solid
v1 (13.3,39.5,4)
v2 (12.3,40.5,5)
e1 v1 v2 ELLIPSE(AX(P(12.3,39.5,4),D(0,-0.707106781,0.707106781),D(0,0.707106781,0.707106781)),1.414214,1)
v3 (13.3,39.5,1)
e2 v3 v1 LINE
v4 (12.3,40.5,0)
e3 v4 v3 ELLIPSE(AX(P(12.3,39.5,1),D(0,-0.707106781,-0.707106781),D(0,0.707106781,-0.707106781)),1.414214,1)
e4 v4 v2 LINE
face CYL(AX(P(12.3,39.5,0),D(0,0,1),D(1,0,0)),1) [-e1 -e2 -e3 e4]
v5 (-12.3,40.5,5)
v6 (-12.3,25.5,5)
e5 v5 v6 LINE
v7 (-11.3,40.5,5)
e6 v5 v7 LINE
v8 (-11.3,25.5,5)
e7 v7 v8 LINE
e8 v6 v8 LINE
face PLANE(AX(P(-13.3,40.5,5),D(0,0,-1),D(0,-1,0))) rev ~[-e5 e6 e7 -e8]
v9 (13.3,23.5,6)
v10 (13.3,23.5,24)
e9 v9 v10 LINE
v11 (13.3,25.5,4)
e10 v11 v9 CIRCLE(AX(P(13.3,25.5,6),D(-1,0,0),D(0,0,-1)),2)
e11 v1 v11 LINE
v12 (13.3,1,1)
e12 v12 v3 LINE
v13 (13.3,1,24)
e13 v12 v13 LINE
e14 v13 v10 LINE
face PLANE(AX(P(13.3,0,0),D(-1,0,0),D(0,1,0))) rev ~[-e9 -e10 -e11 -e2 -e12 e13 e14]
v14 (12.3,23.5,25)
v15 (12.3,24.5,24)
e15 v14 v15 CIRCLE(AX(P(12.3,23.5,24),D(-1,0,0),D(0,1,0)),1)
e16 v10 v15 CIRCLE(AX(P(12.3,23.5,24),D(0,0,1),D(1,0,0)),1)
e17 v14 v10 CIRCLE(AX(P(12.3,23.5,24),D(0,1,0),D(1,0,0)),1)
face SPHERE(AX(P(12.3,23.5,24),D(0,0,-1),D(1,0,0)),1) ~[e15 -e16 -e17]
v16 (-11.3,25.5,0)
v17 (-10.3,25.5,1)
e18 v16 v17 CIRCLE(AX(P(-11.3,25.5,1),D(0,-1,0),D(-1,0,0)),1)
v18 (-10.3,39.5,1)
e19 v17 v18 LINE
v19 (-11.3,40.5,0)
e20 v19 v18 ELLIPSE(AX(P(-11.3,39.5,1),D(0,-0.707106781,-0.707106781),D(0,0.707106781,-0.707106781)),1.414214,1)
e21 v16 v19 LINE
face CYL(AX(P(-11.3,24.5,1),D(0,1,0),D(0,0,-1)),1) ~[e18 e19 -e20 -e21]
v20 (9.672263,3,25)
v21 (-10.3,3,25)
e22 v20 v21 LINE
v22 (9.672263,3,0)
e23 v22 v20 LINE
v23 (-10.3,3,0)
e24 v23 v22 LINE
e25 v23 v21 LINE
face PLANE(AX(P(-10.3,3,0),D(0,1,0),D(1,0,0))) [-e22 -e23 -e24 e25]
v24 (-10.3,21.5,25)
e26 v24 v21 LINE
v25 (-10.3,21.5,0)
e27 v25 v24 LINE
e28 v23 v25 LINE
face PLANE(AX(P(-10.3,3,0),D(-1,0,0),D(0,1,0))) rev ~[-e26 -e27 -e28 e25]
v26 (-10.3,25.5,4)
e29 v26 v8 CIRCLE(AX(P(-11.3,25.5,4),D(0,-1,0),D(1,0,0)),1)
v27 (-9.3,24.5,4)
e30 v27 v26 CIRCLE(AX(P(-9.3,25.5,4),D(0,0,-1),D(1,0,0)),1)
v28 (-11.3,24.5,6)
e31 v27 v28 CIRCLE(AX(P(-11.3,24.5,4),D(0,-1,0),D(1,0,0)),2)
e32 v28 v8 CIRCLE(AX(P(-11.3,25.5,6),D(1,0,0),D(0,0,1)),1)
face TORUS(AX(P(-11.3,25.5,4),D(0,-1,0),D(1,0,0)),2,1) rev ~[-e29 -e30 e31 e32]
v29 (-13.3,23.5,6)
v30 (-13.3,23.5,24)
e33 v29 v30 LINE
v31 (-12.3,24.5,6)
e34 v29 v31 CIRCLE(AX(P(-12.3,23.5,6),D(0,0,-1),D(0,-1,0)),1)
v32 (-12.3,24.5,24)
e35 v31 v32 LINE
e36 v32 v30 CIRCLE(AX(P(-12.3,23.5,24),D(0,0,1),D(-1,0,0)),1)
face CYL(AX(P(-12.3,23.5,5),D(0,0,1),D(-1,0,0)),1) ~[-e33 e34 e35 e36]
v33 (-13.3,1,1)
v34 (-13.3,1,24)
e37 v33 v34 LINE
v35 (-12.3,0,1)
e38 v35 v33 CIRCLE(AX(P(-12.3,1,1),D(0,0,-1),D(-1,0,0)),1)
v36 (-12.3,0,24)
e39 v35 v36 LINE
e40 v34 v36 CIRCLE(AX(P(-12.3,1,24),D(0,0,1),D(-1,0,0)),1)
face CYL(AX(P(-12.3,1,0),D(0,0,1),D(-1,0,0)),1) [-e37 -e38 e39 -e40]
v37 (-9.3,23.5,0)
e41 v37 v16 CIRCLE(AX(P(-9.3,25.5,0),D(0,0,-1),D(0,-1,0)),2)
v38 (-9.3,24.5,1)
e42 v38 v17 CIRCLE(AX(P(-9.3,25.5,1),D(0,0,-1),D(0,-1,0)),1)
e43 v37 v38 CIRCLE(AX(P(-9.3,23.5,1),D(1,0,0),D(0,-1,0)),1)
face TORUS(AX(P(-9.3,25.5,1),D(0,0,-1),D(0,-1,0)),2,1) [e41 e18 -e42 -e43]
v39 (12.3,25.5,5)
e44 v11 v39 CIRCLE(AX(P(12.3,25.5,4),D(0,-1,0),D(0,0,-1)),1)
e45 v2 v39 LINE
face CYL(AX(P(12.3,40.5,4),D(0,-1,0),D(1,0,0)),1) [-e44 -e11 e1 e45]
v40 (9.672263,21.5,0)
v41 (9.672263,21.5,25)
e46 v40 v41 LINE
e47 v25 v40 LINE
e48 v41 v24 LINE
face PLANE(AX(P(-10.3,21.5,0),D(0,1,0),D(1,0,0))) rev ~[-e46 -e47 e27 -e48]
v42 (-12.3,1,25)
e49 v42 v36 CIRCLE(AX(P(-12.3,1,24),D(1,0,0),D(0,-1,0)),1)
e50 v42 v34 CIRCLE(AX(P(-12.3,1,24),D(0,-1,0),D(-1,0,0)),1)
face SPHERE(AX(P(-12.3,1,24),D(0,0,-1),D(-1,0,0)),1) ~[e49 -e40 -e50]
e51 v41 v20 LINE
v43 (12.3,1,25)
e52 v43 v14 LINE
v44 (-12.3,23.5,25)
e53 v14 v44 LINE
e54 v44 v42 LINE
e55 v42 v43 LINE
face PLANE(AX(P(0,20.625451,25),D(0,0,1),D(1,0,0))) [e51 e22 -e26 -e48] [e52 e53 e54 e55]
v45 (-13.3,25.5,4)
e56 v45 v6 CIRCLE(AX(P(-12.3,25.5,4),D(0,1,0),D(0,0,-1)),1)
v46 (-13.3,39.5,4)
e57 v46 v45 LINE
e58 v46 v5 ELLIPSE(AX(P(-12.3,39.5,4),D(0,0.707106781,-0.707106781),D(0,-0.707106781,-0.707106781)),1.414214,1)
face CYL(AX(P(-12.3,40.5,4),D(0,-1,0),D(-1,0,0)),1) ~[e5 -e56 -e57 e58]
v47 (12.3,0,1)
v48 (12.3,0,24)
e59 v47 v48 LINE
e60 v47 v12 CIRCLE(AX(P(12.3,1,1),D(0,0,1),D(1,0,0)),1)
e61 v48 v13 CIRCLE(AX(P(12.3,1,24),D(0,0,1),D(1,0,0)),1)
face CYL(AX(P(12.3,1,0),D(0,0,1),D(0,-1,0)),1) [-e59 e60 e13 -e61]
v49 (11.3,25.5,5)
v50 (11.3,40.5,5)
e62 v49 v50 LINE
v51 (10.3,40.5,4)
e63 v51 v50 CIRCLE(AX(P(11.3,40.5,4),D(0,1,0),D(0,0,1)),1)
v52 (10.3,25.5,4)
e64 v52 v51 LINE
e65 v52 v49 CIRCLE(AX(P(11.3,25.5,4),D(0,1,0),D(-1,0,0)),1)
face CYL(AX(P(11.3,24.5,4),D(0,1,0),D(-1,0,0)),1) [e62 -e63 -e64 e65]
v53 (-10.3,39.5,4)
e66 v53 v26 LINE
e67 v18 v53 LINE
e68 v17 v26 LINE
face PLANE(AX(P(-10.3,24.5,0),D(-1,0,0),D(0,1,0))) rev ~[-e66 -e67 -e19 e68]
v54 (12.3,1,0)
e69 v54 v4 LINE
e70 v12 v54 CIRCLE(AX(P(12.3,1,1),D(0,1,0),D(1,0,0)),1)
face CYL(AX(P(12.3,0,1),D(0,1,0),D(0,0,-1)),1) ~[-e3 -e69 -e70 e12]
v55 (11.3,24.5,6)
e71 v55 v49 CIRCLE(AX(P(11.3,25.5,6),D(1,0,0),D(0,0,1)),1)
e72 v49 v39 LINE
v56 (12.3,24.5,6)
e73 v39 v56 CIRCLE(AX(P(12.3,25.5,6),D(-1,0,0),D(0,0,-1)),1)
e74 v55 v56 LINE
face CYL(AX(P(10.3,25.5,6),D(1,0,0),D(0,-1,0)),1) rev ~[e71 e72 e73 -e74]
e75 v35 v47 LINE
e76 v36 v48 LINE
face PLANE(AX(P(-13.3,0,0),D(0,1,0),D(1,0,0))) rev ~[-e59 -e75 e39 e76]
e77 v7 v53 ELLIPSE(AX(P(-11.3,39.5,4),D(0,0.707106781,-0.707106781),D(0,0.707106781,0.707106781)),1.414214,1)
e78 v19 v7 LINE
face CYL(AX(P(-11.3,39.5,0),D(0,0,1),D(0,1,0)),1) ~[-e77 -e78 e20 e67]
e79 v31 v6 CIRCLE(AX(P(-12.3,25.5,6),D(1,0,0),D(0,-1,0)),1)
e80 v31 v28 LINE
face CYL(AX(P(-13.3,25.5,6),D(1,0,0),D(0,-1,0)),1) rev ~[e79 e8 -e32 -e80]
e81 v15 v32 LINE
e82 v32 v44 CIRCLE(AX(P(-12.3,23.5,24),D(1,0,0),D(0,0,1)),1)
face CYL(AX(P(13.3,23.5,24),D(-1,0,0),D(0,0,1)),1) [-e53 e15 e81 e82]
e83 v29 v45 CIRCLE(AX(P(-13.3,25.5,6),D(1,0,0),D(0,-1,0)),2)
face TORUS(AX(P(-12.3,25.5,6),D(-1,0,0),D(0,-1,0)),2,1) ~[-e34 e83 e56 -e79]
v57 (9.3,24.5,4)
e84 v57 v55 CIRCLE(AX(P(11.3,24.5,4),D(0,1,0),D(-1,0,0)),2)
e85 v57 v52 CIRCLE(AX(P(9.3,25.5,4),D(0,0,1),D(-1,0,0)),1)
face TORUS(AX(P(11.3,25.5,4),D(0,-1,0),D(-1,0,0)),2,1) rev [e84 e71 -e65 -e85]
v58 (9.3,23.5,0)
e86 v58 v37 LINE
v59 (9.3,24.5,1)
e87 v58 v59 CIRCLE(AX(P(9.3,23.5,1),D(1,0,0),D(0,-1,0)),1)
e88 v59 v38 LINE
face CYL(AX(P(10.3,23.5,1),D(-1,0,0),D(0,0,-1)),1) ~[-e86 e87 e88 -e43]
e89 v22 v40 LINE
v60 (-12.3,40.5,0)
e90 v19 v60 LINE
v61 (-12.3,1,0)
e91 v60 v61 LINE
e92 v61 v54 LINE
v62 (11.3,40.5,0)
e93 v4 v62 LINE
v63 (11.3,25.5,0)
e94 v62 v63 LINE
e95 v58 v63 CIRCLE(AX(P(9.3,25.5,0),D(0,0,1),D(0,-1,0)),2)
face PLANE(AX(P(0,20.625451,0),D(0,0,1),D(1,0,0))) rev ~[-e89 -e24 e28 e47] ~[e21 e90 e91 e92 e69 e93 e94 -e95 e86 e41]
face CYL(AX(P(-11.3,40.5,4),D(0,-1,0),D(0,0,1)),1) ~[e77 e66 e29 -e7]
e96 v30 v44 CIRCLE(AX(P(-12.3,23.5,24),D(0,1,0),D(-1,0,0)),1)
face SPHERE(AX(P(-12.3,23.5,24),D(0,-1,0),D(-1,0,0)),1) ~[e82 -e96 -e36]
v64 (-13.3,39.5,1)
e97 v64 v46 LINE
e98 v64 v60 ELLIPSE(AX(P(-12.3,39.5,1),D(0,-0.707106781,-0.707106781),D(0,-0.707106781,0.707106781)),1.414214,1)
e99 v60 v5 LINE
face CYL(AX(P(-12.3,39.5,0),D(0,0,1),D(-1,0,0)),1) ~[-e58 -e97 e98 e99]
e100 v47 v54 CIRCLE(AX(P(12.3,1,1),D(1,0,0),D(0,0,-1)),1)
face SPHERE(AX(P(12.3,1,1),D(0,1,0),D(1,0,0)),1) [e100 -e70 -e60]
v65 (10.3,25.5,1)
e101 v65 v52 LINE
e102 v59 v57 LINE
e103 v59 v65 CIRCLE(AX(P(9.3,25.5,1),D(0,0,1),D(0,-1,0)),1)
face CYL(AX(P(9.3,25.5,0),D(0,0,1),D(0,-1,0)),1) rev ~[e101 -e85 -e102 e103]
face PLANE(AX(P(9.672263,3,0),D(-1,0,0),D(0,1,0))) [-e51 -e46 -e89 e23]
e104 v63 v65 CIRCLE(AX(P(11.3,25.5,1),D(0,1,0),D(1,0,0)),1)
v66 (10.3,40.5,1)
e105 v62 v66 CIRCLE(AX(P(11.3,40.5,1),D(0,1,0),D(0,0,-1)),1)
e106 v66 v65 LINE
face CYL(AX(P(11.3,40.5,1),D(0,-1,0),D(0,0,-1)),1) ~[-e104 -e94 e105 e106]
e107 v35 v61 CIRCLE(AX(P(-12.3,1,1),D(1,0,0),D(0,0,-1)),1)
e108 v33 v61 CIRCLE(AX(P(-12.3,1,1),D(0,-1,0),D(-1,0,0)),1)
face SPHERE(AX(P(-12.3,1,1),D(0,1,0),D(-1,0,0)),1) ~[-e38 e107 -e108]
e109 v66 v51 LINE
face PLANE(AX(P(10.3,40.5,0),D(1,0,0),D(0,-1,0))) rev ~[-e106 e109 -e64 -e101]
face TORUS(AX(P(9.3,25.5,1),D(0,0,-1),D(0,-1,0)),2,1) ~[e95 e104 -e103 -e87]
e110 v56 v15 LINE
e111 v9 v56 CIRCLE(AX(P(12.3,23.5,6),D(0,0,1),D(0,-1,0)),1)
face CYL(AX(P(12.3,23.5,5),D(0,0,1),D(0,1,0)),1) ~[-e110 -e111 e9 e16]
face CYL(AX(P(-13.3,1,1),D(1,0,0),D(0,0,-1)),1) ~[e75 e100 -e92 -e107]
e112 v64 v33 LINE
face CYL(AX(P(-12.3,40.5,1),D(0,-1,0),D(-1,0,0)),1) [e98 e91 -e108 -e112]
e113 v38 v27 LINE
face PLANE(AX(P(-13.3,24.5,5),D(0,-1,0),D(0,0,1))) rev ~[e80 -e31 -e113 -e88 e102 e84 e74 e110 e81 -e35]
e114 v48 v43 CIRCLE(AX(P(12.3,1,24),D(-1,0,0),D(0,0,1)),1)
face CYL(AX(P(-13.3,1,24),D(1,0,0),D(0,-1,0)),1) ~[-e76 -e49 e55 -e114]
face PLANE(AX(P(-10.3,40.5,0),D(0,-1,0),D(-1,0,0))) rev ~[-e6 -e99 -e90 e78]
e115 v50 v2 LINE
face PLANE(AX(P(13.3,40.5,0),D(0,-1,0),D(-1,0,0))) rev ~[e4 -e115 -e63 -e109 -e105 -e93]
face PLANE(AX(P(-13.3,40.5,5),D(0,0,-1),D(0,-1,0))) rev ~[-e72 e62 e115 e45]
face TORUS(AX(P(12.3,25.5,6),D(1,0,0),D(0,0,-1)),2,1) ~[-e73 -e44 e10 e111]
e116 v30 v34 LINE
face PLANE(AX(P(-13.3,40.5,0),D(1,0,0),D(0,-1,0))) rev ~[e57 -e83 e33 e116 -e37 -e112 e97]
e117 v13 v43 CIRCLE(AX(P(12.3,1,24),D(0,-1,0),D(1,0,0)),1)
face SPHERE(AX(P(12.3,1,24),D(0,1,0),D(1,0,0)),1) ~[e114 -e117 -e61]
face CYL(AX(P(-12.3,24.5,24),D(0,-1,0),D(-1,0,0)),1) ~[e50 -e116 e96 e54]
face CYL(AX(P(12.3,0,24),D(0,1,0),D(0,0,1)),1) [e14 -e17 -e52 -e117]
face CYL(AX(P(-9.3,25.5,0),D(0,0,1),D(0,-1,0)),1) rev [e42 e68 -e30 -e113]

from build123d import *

# Parameters (mm, degrees)
F1_DEPTH = 25
F2_W     = 16
F2_H     = 20
F3_DEPTH = 26.601
F4_W     = 19.9722627059
F4_H     = 18.5
F5_DEPTH = 25.001
F6_R     = 1


with BuildPart() as f1:
    # F0 (on Top) → F1 (new body)
    with BuildSketch(Plane.XY):
        Polygon((-13.3, 40.5), (-13.3, 0), (0, 0), (13.3, 0), (13.3, 40.5), (10.3, 40.5), (10.3, 24.5), (0, 24.5), (-10.3, 24.5), (-10.3, 40.5), align=None)
    extrude(amount=F1_DEPTH)

    # F2 (on face) → F3 (cut, through all)
    with BuildSketch(Plane(origin=(-13.3, 0, 0), x_dir=(0, -1, 0), z_dir=(-1, 0, 0))):
        with Locations((-32.5, 15)):
            Rectangle(F2_W, F2_H)
    extrude(amount=-F3_DEPTH, mode=Mode.SUBTRACT)

    # F4 (on face) → F5 (cut, through all)
    with BuildSketch(Plane.XY):
        with Locations((-0.3138686471, 12.25)):
            Rectangle(F4_W, F4_H)
    extrude(amount=F5_DEPTH, mode=Mode.SUBTRACT)

    # F6
    f6_edges = [f1.edges().sort_by_distance(p)[0] for p in [
        (13.3, 20.25, 0),
        (13.3, 40.5, 2.5),
        (13.3, 32.5, 5),
        (13.3, 24.5, 15),
        (13.3, 12.25, 25),
        (13.3, 0, 12.5),
        (-13.3, 20.25, 0),
        (-13.3, 0, 12.5),
        (-13.3, 12.25, 25),
        (-13.3, 24.5, 15),
        (-13.3, 32.5, 5),
        (-13.3, 40.5, 2.5),
        (0, 0, 25),
        (0, 0, 0),
        (0, 24.5, 25),
        (0, 24.5, 0),
        (-11.8, 24.5, 5),
        (11.8, 24.5, 5),
        (10.3, 32.5, 5),
        (-10.3, 32.5, 0),
        (-10.3, 40.5, 2.5),
        (-10.3, 32.5, 5),
        (-10.3, 24.5, 2.5),
        (10.3, 32.5, 0),
        (10.3, 24.5, 2.5),
    ]]
    fillet(f6_edges, radius=F6_R)


solid = f1.part
